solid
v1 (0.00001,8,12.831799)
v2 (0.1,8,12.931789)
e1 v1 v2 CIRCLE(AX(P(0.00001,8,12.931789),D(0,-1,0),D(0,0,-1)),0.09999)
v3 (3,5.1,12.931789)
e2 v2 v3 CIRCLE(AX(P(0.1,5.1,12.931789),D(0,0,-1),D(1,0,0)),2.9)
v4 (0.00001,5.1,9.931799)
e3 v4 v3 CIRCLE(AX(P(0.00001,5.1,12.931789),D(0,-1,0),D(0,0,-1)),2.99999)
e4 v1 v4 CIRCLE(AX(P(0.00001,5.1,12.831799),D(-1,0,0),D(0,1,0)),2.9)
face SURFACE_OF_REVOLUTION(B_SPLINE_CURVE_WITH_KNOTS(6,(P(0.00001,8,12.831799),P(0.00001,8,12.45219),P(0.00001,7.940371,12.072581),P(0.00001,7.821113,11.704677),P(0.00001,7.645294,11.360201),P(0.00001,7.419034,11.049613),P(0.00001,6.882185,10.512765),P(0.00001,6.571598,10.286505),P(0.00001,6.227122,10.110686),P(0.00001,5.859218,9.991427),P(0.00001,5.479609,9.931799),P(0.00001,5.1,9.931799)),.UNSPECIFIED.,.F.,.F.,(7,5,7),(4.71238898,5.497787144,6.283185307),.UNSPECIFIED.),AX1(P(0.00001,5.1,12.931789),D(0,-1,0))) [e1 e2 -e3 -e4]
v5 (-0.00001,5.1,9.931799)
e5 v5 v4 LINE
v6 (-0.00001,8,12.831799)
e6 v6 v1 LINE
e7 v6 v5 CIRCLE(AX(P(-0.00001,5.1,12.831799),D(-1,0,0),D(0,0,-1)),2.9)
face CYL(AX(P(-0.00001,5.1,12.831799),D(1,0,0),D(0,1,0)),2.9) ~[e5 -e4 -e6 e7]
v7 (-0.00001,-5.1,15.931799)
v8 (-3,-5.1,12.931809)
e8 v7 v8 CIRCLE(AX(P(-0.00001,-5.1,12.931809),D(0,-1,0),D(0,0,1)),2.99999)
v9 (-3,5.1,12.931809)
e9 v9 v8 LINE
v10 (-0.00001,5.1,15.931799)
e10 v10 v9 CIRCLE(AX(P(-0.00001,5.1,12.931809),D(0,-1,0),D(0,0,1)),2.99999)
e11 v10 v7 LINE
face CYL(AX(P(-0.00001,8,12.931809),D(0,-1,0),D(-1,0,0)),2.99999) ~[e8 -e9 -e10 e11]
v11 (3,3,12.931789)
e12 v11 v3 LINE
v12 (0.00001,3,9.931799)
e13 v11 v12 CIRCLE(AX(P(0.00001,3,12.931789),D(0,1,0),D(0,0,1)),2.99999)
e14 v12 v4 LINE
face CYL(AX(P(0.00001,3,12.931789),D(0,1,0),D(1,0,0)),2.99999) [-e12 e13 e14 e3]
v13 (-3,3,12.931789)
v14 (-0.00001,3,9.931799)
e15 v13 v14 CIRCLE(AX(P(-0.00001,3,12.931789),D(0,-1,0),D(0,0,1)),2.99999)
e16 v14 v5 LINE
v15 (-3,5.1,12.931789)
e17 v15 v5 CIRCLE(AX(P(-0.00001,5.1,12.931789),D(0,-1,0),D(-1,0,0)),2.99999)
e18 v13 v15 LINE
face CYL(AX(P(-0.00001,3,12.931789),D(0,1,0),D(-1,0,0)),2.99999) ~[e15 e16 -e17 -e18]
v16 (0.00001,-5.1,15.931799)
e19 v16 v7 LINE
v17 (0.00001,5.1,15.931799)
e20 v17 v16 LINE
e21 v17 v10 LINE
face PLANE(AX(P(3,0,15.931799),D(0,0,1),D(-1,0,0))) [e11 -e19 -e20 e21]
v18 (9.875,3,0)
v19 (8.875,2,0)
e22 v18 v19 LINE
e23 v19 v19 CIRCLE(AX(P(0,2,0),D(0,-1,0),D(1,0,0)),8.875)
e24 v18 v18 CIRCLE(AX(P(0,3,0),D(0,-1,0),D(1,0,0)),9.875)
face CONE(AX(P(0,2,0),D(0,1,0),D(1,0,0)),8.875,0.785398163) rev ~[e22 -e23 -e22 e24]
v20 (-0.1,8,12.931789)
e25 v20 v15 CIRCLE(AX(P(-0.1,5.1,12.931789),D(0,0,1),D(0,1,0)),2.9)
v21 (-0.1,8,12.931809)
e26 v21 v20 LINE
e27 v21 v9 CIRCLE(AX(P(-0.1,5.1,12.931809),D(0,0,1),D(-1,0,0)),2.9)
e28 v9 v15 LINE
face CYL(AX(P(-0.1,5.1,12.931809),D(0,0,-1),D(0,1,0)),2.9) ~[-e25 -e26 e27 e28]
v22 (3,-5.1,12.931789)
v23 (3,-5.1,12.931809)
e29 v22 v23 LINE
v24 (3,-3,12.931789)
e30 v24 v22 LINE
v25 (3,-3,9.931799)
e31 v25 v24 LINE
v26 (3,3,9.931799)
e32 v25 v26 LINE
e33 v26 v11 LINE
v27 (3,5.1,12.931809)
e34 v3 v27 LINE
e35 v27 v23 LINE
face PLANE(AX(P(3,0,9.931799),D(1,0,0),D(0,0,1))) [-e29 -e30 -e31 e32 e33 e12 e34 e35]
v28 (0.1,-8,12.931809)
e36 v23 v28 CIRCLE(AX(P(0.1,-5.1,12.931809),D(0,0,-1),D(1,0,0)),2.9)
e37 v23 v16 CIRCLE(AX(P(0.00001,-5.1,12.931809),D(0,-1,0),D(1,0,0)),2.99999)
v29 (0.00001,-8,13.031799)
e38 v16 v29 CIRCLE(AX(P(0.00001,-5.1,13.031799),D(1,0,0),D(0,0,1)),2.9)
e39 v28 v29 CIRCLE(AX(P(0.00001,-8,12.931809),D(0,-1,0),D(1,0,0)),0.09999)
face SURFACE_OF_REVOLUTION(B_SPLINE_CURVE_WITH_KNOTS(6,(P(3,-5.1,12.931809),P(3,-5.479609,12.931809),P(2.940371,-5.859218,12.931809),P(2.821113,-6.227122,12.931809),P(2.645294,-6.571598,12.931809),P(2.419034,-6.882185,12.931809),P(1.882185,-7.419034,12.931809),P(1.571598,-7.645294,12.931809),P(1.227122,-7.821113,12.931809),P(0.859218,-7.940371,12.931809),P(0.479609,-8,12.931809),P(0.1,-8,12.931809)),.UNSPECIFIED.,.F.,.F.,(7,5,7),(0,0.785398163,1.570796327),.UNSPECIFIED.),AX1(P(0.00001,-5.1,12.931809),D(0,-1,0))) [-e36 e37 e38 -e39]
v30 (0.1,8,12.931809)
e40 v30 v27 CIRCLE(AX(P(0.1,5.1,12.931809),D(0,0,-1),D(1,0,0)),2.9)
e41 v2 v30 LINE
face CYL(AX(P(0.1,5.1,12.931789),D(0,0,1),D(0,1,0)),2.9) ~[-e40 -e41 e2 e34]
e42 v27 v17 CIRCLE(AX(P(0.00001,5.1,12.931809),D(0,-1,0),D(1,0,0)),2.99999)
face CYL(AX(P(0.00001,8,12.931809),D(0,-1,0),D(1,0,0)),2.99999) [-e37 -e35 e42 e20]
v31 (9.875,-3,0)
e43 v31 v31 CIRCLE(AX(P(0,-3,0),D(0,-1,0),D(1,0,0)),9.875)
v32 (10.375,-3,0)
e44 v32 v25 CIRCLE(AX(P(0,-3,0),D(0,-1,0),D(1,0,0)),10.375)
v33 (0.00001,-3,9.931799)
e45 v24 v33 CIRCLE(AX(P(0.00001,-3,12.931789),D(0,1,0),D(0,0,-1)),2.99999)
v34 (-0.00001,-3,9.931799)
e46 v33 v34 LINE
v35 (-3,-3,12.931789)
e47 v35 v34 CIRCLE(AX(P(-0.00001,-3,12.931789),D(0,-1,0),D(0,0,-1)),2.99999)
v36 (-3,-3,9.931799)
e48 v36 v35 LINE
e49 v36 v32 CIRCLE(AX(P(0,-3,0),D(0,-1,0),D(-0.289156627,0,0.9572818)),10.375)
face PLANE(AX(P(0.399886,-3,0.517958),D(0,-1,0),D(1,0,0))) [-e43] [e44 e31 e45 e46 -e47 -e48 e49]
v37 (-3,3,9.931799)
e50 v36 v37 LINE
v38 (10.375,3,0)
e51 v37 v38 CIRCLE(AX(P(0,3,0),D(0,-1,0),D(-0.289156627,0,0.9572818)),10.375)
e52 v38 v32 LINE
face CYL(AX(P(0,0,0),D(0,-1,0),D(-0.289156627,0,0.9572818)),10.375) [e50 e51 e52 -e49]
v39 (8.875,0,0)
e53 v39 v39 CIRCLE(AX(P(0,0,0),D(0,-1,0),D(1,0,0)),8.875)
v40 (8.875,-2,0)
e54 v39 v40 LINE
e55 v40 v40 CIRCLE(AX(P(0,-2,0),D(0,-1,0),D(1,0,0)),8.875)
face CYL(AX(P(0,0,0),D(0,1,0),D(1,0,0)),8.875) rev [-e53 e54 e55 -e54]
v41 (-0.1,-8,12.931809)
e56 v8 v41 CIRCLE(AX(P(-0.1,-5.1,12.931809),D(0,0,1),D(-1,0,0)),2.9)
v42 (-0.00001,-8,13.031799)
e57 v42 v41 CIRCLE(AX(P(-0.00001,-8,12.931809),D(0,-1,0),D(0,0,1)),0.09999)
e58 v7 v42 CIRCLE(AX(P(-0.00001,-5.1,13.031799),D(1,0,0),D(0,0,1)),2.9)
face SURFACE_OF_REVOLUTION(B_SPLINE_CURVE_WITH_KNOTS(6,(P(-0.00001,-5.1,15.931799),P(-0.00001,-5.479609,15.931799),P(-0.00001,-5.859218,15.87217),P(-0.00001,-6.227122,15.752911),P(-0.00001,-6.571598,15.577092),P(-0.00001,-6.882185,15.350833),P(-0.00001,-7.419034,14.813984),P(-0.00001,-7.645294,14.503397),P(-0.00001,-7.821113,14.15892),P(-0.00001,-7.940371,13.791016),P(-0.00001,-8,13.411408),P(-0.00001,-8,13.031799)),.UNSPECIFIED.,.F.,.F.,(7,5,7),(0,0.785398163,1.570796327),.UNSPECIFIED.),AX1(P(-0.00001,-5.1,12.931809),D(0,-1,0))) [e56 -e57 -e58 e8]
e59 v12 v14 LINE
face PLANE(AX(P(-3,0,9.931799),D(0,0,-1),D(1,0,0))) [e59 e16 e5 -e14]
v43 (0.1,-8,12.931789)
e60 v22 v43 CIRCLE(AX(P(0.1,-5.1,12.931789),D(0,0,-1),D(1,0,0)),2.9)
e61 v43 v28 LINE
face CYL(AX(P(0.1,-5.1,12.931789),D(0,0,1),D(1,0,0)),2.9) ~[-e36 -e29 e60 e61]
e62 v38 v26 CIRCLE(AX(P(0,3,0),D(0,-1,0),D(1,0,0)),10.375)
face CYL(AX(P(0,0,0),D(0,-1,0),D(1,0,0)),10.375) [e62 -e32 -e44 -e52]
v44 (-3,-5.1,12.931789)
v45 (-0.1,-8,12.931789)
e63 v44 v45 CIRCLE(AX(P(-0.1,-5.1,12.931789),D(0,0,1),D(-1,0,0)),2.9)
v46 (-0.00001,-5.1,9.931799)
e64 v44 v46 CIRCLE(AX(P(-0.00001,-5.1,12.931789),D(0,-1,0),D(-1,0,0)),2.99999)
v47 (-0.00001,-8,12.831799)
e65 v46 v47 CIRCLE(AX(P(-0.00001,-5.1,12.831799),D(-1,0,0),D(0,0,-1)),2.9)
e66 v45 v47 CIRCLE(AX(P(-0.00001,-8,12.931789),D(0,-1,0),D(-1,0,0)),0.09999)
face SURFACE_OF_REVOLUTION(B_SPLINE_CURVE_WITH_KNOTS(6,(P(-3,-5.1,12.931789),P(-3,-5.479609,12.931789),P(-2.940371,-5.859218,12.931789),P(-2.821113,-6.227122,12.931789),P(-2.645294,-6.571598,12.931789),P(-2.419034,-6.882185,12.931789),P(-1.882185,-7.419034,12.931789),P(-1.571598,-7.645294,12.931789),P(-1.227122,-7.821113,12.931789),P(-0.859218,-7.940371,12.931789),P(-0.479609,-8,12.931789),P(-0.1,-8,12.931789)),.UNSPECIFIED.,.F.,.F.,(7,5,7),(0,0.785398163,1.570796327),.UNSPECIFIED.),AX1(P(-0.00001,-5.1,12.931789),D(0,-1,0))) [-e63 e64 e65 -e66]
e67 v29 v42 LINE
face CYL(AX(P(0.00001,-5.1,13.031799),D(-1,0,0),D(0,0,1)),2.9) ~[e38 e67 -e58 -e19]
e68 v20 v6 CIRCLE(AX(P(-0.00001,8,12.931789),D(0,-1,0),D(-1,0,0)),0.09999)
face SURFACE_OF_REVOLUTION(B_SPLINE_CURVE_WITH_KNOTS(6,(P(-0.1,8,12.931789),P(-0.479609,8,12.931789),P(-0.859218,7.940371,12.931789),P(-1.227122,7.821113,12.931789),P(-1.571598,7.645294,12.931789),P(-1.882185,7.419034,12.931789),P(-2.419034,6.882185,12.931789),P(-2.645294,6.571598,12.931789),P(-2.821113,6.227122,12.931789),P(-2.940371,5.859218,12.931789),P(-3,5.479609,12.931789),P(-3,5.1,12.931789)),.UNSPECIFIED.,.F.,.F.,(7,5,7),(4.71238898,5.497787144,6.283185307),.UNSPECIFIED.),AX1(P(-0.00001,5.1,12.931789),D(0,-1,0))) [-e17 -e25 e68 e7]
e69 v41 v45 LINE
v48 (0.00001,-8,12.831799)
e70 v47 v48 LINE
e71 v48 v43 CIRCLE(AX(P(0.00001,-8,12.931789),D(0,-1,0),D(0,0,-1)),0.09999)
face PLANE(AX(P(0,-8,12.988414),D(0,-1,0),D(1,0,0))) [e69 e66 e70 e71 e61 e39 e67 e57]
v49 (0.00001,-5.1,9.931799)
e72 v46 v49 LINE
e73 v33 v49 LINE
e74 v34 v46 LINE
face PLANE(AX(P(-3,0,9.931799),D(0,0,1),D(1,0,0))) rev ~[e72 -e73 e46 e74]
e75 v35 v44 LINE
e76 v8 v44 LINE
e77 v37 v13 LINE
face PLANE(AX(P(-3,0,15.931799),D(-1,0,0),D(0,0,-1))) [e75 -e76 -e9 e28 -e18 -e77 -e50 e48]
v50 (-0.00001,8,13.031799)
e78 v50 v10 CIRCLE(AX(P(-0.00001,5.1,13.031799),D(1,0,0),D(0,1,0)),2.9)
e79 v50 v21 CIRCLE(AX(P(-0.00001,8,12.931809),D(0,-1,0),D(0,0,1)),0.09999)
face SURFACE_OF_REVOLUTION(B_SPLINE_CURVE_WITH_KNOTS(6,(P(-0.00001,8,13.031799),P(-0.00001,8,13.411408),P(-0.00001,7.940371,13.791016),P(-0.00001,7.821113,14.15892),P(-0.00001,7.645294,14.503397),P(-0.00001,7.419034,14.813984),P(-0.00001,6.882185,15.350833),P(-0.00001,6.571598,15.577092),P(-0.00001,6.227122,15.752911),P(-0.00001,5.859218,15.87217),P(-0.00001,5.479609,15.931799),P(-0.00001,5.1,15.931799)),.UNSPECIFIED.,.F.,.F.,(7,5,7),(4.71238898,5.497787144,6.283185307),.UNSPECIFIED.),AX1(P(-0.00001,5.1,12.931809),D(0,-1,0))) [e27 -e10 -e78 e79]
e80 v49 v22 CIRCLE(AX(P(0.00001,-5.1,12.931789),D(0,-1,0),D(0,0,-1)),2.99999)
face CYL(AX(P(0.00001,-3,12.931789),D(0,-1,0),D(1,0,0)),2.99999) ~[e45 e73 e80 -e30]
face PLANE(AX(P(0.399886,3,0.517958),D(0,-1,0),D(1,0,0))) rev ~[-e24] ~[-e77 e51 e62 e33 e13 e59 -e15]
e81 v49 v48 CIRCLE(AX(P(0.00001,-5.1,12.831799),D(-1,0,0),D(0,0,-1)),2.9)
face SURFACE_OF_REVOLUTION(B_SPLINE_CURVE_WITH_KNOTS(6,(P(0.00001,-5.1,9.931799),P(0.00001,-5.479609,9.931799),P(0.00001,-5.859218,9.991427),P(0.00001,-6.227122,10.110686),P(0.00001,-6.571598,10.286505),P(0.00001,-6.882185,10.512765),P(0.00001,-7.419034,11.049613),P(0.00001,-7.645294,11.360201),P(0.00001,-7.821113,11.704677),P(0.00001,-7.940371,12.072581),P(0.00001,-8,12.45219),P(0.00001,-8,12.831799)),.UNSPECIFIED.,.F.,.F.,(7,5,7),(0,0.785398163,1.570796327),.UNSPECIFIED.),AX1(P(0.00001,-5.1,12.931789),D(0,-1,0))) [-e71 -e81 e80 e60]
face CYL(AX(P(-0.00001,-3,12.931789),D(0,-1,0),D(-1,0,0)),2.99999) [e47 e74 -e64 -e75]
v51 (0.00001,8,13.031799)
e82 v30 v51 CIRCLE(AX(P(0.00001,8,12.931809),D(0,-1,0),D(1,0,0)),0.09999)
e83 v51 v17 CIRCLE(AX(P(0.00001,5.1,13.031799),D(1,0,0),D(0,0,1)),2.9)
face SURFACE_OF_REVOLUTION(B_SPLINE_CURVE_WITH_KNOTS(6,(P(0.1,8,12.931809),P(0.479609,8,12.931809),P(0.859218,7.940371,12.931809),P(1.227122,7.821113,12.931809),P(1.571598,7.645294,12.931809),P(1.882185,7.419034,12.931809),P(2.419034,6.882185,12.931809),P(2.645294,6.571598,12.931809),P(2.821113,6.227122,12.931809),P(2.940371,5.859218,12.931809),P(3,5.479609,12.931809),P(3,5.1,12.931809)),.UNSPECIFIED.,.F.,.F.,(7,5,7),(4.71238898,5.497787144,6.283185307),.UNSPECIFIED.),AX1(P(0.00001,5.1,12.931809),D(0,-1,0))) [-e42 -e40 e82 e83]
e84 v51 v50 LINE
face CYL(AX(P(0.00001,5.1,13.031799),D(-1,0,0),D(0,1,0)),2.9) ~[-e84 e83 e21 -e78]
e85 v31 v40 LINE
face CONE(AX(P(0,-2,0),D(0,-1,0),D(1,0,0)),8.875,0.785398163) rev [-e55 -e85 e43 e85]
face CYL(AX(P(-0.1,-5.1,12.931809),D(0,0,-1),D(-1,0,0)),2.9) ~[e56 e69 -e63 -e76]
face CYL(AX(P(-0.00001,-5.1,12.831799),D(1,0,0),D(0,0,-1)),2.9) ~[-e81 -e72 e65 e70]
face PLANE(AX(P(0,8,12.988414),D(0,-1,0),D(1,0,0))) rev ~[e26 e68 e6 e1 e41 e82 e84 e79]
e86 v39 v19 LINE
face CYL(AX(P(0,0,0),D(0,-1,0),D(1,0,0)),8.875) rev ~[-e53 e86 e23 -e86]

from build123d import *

# Parameters (mm, degrees)
F0_R          = 8.875
F1_DEPTH      = 3
F1_DEPTH_BACK = 3
F2_SIZE       = 1
F3_DEPTH      = 8
F3_DEPTH_BACK = 8
F4_R          = 2.99999
F5_R          = 2.9


# Not quite as in the source:
# - a fillet or chamfer is up to 0.001 mm smaller than in the source, because OpenCascade refuses the exact size
# - a feature names something its author has since deleted; it is built from what else it names


with BuildPart() as f1:
    # F0 (on Front) → F1 (new body, two sides)
    with BuildSketch(Plane.XZ) as f1_sk:
        with BuildLine():
            ThreePointArc((-3, 9.931798679), (-6.1852900094, -8.3296345958), (10.375, 0))
            ThreePointArc((10.375, 0), (8.3296345958, 6.1852900094), (3, 9.931798679))
            Line((3, 9.931798679), (-3, 9.931798679))
        make_face()
        Circle(F0_R, mode=Mode.SUBTRACT)
    extrude(amount=F1_DEPTH)
    extrude(f1_sk.sketch, amount=-F1_DEPTH_BACK)

    # F2
    f2_edges = [f1.edges().sort_by_distance(p)[0] for p in [
        (-8.875, -3, 0),
        (-8.875, 3, 0),
    ]]
    chamfer(f2_edges, length=F2_SIZE)

    # F0 (on Front) → F3 (join, two sides)
    with BuildSketch(Plane.XZ) as f3_sk:
        with BuildLine():
            ThreePointArc((-3, 9.931798679), (0, 10.375), (3, 9.931798679))
            Line((3, 9.931798679), (3, 15.931798679))
            Line((3, 15.931798679), (-3, 15.931798679))
            Line((-3, 15.931798679), (-3, 9.931798679))
        make_face()
        with BuildLine():
            Line((-3, 9.931798679), (3, 9.931798679))
            ThreePointArc((3, 9.931798679), (0, 10.375), (-3, 9.931798679))
        make_face()
    extrude(amount=F3_DEPTH)
    extrude(f3_sk.sketch, amount=-F3_DEPTH_BACK)

    # F4 (radius 3 in the source; OpenCascade refuses exactly that, so slightly less here)
    f4_edges = [f1.edges().sort_by_distance(p)[0] for p in [
        (-3, 0, 15.931799),
        (3, 0, 15.931799),
        (3, -5.5, 9.931799),
        (3, 5.5, 9.931799),
        (-3, -5.5, 9.931799),
        (-3, 5.5, 9.931799),
    ]]
    fillet(f4_edges, radius=F4_R)

    # F5
    f5_edges = [f1.edges().sort_by_distance(p)[0] for p in [
        (2.121323, -8, 15.053122),
        (2.121323, 8, 15.053122),
        (3, -8, 12.931799),
        (3, 8, 12.931799),
        (2.121323, -8, 10.810475),
        (0, -8, 9.931799),
        (0, -8, 15.931799),
        (-2.121323, -8, 10.810475),
        (-2.121323, -8, 15.053122),
        (-3, -8, 12.931799),
        (2.121323, 8, 10.810475),
        (0, 8, 9.931799),
        (0, 8, 15.931799),
        (-2.121323, 8, 10.810475),
        (-2.121323, 8, 15.053122),
        (-3, 8, 12.931799),
    ]]
    fillet(f5_edges, radius=F5_R)


solid = f1.part
